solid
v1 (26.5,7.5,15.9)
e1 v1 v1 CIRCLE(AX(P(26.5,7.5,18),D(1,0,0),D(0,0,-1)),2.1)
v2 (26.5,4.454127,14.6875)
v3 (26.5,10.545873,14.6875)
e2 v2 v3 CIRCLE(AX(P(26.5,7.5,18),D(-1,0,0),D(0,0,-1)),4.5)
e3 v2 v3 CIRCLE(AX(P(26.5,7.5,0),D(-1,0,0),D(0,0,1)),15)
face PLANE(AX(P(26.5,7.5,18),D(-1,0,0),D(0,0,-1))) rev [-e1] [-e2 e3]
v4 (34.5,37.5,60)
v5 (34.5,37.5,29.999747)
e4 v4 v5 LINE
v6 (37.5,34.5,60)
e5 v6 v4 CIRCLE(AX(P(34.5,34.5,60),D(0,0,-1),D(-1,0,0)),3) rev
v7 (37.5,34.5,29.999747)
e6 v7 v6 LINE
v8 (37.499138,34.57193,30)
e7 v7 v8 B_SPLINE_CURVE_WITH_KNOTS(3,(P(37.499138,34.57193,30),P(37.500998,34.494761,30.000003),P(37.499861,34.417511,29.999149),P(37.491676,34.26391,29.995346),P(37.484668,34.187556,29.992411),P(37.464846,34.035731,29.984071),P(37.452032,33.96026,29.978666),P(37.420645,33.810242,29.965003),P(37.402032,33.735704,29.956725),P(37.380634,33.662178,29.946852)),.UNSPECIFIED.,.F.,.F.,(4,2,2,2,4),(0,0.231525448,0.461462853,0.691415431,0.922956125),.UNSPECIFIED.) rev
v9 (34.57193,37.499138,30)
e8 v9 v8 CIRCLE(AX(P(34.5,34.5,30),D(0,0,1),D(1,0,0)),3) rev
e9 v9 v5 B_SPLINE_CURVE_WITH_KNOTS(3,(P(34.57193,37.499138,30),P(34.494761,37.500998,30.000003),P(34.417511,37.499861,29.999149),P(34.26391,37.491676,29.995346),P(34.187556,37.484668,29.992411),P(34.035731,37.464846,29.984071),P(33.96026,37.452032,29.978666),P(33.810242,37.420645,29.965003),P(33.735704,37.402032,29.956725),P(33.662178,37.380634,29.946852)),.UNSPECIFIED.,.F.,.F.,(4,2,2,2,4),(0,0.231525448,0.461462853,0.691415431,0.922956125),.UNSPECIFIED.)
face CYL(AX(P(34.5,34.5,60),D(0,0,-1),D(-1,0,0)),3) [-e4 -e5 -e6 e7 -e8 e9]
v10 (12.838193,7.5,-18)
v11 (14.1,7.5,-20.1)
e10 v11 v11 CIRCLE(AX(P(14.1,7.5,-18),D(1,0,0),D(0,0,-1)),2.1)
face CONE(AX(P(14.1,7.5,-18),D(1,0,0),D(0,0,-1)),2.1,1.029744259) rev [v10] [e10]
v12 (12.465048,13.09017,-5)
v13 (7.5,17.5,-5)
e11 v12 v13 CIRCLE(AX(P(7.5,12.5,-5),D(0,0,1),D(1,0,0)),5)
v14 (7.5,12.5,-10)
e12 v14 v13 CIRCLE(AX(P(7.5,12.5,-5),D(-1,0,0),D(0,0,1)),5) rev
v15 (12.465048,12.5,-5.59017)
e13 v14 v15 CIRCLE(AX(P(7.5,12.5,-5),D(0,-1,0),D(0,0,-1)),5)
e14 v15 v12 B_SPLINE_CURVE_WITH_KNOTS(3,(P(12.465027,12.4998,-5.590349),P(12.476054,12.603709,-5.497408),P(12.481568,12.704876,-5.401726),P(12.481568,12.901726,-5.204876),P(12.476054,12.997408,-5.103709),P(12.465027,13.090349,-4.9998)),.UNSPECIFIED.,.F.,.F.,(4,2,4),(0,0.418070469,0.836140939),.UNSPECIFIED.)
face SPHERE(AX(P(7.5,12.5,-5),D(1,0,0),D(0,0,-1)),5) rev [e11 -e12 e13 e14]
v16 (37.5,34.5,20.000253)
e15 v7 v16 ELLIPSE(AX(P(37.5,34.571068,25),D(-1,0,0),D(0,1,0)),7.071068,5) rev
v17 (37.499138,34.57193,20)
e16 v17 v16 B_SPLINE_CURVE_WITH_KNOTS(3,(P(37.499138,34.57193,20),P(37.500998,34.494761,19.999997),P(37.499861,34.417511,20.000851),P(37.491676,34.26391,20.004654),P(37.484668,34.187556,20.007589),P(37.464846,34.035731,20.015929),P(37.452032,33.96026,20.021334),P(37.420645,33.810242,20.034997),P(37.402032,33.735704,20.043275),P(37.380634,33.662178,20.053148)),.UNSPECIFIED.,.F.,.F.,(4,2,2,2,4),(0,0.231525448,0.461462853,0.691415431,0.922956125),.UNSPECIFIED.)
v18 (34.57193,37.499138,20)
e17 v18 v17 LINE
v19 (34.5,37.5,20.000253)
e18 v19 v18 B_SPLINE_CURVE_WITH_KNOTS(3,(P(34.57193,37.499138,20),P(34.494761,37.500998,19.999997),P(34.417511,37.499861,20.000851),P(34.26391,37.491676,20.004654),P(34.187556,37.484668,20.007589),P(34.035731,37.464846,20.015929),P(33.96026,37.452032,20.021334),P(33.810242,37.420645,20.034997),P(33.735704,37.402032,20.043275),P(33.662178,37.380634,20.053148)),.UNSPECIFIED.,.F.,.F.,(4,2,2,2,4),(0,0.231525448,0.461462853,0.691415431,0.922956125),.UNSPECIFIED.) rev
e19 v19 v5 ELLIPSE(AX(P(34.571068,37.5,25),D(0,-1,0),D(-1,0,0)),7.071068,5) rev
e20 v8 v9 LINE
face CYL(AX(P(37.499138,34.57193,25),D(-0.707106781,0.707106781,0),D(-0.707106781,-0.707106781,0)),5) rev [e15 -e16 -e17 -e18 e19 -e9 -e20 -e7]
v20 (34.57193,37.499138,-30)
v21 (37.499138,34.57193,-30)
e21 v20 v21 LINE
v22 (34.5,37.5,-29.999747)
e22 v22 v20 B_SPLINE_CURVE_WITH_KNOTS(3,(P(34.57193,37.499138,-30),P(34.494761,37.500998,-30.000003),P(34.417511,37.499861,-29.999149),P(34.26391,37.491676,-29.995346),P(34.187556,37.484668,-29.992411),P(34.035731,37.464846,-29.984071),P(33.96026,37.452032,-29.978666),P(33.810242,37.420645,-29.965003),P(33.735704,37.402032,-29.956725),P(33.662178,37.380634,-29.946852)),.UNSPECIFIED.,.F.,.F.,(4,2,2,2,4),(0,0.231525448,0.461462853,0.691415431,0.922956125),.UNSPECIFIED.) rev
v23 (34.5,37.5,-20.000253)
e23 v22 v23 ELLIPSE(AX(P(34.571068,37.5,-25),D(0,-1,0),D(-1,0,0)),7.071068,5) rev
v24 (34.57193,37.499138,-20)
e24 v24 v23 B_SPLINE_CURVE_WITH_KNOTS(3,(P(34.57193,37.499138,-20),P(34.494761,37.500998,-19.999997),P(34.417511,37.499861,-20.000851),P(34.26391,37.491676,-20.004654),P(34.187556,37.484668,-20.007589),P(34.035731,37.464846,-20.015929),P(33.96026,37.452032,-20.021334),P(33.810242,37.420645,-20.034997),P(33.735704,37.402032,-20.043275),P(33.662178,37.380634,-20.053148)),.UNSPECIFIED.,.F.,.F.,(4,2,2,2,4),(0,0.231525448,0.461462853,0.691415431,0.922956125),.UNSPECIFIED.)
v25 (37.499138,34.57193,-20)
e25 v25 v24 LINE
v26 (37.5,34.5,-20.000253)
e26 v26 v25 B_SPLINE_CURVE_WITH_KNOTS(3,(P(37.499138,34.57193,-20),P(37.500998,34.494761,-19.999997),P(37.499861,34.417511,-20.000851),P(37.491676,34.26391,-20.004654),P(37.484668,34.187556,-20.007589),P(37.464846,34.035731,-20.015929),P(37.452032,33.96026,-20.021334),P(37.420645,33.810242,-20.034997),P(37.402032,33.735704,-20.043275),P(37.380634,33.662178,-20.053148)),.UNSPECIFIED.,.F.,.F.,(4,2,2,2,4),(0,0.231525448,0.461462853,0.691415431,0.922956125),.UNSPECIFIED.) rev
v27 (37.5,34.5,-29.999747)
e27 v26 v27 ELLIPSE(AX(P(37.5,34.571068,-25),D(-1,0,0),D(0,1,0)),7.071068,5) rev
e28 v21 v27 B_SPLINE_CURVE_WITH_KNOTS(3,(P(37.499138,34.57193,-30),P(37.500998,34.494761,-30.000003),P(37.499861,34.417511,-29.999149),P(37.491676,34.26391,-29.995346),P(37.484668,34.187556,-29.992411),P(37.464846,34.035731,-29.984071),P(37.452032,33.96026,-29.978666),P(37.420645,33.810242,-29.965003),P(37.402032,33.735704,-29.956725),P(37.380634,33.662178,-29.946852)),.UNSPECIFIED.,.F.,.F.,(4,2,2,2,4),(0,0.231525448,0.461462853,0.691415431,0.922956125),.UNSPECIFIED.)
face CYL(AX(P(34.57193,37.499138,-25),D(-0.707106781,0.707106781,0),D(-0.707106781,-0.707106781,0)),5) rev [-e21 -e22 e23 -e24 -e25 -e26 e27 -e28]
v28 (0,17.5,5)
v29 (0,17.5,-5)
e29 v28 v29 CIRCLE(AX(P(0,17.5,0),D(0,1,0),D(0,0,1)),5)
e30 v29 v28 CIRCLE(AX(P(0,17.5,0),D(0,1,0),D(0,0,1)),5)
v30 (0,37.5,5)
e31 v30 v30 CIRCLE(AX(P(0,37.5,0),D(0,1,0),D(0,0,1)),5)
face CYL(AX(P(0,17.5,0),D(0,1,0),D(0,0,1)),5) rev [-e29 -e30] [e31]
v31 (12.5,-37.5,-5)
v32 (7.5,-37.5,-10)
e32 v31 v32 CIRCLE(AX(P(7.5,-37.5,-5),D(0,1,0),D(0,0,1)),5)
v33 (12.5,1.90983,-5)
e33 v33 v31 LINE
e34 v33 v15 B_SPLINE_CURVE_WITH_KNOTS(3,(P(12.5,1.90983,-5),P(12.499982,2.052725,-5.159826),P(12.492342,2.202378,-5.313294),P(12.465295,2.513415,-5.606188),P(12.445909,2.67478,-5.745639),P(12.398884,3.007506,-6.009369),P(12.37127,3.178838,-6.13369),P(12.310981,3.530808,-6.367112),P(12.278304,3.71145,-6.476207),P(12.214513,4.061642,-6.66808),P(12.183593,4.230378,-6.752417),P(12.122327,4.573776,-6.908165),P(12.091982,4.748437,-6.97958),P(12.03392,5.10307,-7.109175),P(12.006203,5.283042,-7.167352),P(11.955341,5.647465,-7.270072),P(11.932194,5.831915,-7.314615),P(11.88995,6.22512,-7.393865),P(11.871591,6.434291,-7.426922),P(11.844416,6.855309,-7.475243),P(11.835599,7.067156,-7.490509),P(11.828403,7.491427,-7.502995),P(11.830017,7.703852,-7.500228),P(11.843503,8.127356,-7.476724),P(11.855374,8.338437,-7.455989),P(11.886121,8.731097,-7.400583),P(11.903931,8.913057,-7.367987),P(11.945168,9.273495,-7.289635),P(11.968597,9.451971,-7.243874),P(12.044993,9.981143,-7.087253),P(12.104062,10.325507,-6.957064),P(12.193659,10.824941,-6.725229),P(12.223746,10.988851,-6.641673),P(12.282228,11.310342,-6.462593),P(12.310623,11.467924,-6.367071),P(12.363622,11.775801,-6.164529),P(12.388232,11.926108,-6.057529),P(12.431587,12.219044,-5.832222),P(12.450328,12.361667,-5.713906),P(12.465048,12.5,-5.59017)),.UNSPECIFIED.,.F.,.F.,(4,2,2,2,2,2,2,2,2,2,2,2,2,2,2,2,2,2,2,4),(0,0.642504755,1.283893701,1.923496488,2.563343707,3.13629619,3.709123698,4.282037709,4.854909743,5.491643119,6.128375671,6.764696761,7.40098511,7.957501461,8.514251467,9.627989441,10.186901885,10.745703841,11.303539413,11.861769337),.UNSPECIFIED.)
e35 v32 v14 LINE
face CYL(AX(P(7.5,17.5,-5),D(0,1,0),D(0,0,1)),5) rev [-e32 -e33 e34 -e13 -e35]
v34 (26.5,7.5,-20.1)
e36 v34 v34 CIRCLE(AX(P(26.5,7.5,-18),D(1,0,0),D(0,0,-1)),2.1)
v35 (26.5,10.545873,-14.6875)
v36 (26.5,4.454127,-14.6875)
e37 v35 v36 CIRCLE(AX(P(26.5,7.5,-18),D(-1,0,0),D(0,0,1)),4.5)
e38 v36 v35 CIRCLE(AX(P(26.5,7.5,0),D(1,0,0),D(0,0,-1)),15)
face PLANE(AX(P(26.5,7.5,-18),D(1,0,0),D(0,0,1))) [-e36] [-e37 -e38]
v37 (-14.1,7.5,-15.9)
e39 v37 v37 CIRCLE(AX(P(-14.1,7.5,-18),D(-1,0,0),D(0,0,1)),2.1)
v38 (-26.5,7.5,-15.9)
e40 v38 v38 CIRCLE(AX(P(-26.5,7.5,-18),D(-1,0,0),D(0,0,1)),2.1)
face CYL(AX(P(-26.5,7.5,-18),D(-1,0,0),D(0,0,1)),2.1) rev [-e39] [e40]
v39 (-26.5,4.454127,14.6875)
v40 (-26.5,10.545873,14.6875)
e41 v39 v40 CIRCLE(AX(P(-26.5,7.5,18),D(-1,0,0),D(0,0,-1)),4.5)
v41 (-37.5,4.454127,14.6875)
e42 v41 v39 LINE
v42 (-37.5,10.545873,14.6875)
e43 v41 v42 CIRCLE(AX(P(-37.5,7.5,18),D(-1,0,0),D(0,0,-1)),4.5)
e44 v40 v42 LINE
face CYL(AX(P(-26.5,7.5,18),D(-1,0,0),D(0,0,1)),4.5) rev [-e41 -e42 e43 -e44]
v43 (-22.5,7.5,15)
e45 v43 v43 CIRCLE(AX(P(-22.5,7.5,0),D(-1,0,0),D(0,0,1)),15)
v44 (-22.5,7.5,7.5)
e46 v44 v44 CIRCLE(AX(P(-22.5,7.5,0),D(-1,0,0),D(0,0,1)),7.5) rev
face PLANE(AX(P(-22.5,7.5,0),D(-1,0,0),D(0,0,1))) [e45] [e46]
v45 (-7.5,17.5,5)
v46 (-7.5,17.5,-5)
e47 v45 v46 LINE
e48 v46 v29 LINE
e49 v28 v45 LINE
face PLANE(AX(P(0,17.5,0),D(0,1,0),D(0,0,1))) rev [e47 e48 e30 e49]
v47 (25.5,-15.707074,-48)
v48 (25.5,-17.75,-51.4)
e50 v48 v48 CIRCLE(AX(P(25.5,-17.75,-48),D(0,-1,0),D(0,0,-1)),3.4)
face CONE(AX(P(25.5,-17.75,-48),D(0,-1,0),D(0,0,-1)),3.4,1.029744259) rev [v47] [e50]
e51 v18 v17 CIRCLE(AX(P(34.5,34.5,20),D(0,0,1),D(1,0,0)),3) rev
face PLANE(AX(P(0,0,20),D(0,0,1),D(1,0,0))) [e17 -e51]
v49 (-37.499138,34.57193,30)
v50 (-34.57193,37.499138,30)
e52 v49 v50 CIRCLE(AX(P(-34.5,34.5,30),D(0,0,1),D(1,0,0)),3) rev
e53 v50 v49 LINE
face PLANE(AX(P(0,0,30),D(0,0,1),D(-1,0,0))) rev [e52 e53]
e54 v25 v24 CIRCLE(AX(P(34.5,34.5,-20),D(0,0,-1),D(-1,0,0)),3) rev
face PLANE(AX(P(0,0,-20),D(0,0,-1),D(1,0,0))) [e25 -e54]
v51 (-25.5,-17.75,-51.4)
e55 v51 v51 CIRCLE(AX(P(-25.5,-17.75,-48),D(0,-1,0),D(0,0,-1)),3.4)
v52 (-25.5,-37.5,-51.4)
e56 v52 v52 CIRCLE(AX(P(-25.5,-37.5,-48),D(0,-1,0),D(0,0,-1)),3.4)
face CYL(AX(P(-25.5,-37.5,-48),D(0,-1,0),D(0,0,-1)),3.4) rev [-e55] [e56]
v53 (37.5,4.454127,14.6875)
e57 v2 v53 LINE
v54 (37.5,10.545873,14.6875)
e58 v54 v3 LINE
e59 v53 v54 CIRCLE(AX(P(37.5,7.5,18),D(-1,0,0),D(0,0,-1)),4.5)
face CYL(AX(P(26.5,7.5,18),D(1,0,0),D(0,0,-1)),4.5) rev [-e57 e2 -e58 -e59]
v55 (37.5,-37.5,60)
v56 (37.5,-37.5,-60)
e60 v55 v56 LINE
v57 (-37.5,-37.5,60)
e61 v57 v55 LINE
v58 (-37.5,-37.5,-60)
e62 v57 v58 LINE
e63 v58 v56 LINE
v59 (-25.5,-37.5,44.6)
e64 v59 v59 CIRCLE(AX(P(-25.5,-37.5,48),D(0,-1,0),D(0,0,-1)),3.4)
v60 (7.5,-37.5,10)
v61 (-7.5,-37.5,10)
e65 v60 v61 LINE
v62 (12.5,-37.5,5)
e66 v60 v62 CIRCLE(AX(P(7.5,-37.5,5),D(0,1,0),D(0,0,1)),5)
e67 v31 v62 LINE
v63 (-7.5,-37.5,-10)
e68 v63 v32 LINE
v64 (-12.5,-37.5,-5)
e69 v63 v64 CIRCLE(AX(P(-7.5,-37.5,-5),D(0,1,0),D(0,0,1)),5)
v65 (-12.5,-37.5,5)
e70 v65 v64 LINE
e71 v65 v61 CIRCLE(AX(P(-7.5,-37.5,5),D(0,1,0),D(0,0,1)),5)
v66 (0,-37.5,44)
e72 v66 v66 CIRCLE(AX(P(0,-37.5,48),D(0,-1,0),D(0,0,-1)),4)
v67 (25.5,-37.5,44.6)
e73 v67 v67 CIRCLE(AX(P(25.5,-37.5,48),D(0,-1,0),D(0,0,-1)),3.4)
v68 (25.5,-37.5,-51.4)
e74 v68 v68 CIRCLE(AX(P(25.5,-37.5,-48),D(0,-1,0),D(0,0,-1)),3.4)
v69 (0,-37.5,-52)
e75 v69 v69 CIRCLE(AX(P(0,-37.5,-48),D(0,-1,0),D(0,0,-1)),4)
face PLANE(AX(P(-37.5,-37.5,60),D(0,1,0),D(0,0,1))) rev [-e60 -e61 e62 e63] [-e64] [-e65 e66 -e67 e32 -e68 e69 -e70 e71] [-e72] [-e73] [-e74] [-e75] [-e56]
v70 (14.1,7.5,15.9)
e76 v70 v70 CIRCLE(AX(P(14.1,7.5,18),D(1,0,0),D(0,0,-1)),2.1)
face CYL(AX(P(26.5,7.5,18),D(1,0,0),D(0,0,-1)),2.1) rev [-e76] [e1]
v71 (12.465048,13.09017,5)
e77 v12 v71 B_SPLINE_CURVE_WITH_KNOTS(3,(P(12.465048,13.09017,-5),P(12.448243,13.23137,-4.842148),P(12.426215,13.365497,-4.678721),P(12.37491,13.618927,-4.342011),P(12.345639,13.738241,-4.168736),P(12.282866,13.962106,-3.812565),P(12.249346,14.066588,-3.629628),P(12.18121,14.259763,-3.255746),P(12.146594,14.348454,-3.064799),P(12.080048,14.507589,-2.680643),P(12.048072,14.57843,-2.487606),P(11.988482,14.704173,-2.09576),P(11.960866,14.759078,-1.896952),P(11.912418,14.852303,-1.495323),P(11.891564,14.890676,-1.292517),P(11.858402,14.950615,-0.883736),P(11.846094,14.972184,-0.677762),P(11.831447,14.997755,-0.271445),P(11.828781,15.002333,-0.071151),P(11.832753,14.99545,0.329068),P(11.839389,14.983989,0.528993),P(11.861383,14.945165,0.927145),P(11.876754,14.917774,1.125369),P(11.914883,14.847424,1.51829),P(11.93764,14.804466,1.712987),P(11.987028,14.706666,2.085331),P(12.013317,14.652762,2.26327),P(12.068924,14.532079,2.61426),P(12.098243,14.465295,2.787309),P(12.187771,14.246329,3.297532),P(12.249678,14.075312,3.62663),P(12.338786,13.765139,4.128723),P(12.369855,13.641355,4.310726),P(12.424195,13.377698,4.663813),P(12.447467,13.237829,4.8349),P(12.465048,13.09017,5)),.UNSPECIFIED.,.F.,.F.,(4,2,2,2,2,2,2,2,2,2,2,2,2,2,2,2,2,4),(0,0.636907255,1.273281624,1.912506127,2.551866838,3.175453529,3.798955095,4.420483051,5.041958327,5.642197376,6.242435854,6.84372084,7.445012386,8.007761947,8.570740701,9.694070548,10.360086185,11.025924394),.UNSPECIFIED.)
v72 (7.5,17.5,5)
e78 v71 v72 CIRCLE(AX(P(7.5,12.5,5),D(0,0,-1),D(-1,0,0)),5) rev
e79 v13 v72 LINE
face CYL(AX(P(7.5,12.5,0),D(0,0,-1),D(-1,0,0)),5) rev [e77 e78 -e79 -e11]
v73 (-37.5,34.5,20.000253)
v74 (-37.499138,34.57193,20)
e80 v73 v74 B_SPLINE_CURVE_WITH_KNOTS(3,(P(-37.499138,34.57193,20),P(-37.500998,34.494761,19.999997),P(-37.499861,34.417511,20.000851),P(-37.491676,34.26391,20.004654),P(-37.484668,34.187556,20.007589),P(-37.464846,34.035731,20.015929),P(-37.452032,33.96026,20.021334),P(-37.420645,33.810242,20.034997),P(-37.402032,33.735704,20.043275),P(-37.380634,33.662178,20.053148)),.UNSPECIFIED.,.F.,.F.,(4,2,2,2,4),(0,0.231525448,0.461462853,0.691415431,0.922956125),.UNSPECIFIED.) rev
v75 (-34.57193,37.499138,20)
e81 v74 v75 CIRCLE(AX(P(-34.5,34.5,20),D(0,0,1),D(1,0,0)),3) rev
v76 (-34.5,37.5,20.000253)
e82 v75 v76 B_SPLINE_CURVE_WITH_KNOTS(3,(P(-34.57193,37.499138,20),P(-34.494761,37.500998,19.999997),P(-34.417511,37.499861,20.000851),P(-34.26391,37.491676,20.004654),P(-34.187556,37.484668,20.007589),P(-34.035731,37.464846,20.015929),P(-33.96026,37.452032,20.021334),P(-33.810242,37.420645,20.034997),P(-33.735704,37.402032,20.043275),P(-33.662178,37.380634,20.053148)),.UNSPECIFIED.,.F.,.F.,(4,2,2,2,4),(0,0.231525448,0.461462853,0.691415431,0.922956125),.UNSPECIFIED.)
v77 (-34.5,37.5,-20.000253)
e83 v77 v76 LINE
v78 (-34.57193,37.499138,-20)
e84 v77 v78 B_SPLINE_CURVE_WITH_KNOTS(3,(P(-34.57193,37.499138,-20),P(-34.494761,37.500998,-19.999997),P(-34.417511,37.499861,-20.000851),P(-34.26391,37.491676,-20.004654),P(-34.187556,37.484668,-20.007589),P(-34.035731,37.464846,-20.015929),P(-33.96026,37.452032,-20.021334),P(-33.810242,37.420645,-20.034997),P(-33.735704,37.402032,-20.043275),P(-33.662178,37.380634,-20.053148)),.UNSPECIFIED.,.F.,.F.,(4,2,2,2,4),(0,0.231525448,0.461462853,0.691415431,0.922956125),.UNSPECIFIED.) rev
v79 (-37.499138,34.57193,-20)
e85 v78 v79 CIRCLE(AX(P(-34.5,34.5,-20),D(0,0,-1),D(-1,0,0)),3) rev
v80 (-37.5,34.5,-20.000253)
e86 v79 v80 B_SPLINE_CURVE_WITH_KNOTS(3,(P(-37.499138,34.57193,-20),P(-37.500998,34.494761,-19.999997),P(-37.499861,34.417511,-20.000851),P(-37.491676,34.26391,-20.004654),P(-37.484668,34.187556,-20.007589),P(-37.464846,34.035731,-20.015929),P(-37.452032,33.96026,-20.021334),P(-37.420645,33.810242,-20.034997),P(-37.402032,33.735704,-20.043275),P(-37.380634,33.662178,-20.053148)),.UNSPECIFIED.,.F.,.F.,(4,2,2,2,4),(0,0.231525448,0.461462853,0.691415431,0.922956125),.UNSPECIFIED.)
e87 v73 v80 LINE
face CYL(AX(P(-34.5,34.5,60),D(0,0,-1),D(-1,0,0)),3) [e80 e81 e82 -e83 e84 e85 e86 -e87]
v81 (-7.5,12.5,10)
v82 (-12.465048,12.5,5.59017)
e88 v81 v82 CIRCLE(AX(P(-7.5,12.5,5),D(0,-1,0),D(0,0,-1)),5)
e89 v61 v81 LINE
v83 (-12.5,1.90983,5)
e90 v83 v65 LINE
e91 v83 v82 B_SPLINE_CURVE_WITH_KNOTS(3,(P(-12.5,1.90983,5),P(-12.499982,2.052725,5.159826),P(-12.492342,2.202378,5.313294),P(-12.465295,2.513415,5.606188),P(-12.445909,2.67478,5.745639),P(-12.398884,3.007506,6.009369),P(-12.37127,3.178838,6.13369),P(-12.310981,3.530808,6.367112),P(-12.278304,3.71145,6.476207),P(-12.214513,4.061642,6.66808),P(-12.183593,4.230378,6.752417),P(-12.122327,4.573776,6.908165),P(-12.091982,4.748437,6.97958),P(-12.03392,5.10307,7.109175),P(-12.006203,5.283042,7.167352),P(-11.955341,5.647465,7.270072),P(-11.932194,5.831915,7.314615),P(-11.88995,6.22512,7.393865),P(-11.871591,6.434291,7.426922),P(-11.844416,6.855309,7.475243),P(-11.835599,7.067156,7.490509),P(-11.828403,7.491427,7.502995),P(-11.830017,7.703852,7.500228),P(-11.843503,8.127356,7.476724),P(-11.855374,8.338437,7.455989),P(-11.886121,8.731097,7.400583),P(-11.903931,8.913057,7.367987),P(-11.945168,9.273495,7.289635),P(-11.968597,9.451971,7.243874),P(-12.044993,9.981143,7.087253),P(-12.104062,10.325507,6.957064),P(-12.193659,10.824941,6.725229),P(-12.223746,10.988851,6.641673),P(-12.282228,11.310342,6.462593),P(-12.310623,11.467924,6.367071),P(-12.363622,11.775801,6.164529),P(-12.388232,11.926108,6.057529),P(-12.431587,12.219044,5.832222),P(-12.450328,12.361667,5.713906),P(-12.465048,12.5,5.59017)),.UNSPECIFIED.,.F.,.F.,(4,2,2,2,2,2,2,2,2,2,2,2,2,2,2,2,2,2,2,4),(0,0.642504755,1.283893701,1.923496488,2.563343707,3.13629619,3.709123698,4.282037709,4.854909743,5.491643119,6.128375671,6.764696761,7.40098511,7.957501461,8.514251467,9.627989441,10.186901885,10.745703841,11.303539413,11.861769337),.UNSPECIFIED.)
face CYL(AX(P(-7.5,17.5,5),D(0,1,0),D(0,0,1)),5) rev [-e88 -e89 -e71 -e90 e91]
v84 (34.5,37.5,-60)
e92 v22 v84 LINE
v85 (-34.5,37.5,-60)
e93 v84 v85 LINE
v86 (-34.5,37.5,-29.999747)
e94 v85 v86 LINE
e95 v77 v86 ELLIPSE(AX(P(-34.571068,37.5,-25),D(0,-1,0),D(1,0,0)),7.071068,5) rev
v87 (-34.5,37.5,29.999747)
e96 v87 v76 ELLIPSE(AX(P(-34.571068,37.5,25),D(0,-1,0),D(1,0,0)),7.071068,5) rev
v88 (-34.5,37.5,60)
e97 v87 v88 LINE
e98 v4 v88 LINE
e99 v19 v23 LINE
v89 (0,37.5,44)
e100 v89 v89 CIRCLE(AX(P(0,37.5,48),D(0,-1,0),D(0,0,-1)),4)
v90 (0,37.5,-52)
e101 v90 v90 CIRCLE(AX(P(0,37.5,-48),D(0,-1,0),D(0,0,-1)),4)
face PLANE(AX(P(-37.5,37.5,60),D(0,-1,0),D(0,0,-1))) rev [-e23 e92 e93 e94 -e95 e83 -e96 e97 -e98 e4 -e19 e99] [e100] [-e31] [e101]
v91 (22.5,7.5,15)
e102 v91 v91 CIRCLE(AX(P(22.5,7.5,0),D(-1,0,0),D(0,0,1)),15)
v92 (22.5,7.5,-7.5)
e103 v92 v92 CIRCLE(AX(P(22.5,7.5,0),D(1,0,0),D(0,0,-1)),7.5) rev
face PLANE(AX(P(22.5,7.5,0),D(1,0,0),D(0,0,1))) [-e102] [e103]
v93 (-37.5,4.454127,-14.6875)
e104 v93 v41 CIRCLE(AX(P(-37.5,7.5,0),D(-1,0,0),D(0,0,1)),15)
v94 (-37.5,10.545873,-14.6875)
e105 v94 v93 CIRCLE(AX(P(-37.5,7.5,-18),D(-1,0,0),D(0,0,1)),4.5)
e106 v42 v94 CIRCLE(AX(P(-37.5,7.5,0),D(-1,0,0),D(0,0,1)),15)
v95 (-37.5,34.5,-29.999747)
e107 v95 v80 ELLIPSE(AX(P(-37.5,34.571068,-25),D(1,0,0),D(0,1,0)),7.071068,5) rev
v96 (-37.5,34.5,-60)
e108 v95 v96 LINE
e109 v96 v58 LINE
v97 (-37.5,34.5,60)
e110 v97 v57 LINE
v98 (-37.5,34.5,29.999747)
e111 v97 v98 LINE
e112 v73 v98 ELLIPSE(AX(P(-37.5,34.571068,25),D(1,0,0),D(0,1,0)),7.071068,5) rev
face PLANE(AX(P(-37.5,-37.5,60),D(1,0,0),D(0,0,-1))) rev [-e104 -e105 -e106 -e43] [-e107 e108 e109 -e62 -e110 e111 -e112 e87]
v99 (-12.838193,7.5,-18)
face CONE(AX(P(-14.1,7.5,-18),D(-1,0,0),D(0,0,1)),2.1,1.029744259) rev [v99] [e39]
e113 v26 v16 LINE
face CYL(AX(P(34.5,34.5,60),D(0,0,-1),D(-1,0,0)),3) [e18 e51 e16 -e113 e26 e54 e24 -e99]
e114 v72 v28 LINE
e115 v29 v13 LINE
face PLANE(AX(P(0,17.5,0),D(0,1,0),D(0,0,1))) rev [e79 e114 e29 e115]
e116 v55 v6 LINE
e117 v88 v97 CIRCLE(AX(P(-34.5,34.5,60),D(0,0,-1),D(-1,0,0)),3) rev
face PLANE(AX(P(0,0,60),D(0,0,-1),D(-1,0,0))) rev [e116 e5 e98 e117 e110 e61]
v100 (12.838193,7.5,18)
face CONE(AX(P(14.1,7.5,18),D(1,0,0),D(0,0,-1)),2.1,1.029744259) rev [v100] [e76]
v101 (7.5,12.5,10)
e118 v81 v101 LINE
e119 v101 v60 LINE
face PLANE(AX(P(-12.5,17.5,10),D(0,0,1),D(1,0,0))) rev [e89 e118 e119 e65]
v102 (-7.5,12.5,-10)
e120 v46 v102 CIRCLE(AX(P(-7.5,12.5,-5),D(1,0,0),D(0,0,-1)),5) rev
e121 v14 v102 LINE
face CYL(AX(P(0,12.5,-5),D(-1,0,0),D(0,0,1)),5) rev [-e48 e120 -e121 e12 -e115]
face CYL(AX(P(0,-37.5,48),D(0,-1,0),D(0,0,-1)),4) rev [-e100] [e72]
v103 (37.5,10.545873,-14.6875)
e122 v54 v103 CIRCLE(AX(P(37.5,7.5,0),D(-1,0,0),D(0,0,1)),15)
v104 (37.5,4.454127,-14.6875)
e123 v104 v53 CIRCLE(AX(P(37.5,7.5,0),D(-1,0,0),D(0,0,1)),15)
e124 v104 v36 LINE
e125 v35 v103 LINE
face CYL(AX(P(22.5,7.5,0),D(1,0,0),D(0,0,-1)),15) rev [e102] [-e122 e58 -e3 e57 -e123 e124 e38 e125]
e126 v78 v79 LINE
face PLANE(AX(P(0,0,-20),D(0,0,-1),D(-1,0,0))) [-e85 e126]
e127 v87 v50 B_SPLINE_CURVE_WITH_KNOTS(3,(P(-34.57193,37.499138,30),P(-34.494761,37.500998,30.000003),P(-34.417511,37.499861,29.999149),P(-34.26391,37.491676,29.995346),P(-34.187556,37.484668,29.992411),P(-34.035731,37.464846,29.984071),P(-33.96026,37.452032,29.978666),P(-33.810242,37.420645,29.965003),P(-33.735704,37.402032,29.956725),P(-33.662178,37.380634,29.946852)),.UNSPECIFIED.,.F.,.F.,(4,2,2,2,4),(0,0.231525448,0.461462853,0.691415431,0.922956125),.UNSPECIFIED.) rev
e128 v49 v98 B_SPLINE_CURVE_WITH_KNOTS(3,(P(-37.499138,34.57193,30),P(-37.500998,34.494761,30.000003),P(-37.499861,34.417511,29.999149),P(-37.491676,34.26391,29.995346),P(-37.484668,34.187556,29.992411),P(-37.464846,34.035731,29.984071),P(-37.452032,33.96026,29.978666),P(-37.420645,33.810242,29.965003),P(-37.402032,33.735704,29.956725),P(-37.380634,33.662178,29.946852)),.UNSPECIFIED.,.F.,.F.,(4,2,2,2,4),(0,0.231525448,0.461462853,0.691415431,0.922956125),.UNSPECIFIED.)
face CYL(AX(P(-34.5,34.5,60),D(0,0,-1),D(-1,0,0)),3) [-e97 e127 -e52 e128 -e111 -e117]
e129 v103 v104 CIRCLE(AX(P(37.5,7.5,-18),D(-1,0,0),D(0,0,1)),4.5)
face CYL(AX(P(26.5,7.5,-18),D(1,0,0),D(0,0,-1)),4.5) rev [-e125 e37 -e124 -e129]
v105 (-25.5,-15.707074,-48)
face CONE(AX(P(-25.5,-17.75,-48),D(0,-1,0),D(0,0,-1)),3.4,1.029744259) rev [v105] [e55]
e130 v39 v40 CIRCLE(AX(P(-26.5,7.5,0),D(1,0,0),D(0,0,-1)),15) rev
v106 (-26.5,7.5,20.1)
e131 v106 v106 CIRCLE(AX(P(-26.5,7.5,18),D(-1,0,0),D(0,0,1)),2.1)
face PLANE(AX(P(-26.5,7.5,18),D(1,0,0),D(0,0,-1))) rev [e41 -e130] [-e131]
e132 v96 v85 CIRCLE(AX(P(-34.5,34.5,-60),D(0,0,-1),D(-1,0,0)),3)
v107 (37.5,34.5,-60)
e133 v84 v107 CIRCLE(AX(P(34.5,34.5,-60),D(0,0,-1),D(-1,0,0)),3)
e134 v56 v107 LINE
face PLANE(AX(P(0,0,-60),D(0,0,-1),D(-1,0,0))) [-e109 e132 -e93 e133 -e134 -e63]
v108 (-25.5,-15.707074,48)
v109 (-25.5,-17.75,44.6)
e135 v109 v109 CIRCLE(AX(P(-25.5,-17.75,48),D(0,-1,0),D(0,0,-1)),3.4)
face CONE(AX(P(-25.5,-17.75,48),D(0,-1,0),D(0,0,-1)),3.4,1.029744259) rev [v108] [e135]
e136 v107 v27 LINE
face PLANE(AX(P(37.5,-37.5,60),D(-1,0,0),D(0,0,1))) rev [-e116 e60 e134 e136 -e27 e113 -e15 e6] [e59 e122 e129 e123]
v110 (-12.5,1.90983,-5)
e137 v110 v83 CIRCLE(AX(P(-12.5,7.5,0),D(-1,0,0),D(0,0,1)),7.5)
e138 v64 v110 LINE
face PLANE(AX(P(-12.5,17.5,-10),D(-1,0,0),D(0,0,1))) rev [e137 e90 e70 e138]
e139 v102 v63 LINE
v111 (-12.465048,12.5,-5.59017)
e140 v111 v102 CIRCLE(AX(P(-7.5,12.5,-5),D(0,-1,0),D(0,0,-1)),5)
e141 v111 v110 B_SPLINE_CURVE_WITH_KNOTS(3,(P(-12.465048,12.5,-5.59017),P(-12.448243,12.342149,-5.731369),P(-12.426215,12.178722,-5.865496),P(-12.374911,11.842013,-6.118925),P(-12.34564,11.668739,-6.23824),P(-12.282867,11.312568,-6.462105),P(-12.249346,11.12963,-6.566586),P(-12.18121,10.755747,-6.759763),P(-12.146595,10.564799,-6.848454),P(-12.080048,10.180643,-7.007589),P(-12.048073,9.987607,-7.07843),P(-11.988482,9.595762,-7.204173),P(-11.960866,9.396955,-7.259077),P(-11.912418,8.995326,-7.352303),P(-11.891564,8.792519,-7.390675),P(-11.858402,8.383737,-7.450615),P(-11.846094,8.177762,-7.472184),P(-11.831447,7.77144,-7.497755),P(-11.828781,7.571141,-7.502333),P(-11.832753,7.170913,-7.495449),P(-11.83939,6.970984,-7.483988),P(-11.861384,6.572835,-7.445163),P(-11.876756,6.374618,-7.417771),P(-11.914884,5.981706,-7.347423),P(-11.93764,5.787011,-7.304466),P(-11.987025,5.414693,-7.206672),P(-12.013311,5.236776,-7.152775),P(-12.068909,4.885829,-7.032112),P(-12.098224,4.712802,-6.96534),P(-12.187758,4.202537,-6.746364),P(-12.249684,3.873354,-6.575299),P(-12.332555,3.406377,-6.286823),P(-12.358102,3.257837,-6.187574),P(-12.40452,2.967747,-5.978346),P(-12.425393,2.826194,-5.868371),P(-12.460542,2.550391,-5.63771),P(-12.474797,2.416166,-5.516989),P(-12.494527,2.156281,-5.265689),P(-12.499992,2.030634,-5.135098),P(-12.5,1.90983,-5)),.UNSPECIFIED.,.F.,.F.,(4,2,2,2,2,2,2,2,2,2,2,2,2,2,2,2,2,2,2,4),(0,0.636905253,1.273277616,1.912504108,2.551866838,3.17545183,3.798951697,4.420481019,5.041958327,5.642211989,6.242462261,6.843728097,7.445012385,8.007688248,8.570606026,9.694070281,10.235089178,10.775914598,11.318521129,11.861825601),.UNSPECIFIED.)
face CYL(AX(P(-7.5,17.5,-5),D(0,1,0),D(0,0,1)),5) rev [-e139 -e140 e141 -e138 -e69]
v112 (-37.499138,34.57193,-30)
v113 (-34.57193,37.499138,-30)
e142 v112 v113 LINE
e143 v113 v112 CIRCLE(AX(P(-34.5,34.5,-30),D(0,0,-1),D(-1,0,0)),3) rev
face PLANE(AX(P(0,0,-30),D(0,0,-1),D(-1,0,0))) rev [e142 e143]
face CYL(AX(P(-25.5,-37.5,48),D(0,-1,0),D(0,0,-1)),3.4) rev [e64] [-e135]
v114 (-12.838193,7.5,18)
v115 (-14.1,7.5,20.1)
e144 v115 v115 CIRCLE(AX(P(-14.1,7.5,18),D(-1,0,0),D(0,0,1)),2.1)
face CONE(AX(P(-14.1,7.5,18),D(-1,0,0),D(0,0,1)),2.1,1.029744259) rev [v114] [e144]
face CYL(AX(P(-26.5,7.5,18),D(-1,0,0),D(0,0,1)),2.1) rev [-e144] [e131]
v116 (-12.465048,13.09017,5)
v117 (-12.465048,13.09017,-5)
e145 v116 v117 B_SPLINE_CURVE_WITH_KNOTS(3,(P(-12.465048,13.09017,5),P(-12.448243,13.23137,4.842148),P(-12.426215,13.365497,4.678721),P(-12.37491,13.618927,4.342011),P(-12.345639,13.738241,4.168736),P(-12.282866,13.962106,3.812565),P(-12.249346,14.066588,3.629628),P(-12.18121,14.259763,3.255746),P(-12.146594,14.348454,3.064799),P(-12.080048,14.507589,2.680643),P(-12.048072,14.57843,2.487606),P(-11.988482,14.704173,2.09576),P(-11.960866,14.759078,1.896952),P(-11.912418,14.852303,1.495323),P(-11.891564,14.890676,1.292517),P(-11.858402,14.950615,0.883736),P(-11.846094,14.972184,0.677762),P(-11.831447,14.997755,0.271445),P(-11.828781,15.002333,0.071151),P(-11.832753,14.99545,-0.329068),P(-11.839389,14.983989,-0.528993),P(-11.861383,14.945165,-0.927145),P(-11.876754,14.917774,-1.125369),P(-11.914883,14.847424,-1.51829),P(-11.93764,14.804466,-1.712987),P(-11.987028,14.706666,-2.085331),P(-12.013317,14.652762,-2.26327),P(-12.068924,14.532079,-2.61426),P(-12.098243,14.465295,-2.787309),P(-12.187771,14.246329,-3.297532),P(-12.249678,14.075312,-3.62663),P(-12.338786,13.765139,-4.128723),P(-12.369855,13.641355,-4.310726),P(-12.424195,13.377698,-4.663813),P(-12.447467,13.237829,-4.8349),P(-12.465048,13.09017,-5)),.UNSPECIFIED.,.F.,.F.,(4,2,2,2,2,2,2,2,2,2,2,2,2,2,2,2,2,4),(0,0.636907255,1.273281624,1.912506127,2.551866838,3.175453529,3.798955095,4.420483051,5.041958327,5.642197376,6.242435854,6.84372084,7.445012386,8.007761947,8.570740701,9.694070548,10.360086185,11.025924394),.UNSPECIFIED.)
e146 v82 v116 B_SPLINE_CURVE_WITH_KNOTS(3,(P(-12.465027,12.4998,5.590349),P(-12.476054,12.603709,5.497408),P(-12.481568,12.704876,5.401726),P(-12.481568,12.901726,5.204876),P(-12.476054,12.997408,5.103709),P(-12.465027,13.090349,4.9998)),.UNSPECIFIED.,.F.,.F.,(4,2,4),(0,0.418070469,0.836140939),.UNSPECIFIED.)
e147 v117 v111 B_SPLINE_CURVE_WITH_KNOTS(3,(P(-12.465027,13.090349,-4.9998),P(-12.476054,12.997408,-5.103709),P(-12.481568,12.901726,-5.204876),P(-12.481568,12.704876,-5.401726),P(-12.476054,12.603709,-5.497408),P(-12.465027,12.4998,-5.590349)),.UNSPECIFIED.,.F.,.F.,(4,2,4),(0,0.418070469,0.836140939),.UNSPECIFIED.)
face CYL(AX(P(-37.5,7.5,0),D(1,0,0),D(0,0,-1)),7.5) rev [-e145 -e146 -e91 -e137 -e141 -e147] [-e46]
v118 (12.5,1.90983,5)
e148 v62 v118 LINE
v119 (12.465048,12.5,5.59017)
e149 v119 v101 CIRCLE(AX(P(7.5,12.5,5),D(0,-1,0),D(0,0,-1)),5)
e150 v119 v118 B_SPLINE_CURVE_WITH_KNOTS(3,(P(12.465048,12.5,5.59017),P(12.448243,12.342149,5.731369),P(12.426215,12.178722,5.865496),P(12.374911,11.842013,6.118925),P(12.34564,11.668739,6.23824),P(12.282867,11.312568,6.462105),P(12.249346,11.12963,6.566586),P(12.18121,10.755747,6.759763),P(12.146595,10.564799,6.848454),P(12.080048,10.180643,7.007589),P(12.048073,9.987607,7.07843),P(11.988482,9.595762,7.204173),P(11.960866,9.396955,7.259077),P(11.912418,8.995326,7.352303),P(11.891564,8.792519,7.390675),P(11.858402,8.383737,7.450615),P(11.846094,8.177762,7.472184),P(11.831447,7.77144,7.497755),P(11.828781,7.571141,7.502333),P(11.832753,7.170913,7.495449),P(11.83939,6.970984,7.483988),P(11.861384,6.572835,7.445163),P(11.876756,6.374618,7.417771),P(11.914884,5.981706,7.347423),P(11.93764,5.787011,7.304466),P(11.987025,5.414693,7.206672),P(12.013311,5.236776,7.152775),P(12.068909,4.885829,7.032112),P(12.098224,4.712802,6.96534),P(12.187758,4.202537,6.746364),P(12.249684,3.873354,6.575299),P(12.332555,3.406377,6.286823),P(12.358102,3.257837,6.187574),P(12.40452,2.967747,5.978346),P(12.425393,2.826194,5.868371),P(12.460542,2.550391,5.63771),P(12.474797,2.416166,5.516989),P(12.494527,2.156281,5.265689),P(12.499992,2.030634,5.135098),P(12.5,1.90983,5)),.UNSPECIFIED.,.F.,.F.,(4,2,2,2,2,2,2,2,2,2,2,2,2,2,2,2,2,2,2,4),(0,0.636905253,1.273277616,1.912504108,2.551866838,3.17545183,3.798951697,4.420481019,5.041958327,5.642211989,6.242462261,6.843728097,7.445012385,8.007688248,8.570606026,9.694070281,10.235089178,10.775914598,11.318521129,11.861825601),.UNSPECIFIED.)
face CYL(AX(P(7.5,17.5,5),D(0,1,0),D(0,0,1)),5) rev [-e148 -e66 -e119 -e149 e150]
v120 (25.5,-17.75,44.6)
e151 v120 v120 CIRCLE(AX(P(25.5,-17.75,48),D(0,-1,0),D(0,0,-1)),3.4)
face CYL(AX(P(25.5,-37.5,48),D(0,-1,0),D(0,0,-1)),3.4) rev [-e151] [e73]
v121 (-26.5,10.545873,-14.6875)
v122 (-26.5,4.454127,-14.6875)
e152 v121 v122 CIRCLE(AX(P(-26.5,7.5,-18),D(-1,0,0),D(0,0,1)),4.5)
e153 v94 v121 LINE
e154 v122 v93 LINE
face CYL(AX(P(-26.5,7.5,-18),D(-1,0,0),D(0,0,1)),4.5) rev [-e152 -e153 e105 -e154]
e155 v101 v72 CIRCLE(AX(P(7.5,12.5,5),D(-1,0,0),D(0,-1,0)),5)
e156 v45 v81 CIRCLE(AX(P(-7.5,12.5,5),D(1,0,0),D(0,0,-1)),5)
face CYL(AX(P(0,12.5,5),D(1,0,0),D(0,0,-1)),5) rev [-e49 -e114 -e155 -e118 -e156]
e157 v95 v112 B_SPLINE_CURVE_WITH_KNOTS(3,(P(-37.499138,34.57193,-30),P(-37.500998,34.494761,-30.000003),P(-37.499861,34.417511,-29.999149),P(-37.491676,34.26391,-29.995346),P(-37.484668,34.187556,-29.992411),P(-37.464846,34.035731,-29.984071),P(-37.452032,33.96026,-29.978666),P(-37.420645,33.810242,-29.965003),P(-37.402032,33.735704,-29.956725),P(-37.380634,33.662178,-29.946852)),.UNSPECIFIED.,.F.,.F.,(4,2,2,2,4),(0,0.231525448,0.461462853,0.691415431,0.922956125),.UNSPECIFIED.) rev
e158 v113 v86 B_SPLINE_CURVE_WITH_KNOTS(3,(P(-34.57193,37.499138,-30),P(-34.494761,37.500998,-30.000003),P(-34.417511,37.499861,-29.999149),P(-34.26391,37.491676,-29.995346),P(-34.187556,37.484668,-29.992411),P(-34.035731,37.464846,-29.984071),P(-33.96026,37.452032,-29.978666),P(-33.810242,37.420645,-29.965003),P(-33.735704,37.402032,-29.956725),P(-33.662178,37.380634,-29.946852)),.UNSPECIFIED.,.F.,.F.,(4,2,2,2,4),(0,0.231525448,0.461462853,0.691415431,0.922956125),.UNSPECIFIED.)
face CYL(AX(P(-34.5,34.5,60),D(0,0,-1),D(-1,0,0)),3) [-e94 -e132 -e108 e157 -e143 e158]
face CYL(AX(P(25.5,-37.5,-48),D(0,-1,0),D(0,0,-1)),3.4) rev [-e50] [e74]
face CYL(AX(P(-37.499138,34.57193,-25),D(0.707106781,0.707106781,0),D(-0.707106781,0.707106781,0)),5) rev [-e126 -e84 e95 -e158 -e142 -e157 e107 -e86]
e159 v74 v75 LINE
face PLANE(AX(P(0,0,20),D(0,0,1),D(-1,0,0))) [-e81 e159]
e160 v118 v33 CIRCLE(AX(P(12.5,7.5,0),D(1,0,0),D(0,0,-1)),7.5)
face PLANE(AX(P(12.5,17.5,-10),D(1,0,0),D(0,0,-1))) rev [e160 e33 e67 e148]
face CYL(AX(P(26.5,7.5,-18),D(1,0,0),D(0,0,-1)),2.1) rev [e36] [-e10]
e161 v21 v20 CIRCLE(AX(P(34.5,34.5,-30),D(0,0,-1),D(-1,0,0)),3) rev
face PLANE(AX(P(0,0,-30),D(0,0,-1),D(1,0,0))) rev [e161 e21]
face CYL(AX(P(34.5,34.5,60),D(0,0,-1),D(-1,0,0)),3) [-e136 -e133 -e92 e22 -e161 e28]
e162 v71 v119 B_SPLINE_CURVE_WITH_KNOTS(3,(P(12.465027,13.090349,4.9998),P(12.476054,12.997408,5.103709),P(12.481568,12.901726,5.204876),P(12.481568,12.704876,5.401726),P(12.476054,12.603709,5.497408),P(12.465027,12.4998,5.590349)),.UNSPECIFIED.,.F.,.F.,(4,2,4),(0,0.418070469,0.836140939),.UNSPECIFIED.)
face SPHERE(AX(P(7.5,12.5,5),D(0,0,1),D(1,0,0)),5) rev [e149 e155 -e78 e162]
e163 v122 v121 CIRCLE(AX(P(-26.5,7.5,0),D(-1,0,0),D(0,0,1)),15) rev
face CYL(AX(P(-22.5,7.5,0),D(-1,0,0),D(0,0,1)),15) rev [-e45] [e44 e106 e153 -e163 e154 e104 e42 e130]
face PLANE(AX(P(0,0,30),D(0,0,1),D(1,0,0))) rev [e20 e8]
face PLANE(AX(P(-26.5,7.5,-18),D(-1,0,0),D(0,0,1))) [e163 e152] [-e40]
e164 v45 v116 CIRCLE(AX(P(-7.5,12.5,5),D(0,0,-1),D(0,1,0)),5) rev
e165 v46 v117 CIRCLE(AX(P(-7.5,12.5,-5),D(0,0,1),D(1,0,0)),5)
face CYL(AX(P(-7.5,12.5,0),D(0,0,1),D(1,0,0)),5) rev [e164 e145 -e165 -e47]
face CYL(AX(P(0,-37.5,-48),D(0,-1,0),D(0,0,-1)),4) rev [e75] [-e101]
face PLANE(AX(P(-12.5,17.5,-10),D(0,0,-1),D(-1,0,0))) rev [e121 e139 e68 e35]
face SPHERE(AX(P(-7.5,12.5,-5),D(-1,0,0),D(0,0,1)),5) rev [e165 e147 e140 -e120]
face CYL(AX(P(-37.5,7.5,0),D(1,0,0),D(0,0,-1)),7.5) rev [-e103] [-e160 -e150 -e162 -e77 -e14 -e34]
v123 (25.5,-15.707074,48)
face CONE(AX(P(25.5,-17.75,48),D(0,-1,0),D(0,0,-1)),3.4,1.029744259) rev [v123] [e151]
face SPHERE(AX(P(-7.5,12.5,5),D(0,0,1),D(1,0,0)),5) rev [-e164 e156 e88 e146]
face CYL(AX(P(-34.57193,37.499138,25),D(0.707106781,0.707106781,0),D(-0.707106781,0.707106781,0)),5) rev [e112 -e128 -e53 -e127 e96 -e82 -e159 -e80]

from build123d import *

# Parameters (mm, degrees)
SKETCH1_W                  = 75
SKETCH1_H                  = 75
BOSS_EXTRUDE1_DEPTH        = 60
SKETCH2_R                  = 5
CUT_EXTRUDE1_DEPTH         = 20
FILLET1_R                  = 3
CUT_EXTRUDE2_DEPTH         = 5
FILLET2_R                  = 5
FILLET2_OF_MIRROR1_R       = 5
MIRROR2_START              = -7.071067908
MIRROR2_DEPTH              = 14.142135816
SKETCH4_W                  = 25
SKETCH4_H                  = 20
CUT_EXTRUDE3_DEPTH         = 55
FILLET3_R                  = 5
CUT_EXTRUDE4_DEPTH         = 81.078087059
CUT_EXTRUDE4_DEPTH_BACK    = 81.078087059
SKETCH5_R                  = 7.5
SKETCH7_R                  = 15
CUT_EXTRUDE5_DEPTH         = 15
SKETCH8_R                  = 4.5
CUT_EXTRUDE6_DEPTH         = 11
M5_TAPPED_HOLE1_AT_2_COUNT = 2
M5_TAPPED_HOLE1_AT_2_PITCH = 36
M8_TAPPED_HOLE1_D          = 6.8
M8_TAPPED_HOLE1_DEPTH      = 19.75
M8_TAPPED_HOLE1_TIP        = 2.042926105
F_8_0MM_DOWEL_HOLE1_D      = 8


# Read off the part's stored shape, not the designer's step: Mirror2
with BuildPart() as part:
    # Sketch1 → Boss-Extrude1 (new, symmetric)
    with BuildSketch(Plane.XY):
        Rectangle(SKETCH1_W, SKETCH1_H)
    extrude(amount=BOSS_EXTRUDE1_DEPTH, both=True)

    # Sketch2 → Cut-Extrude1 (cut)
    with BuildSketch(Plane(origin=(0, 37.5, 0), x_dir=(1, 0, 0), z_dir=(0, 1, 0))):
        with Locations(Location((0, 0, 0), (0, 0, 270))):
            Circle(SKETCH2_R)
    extrude(amount=-CUT_EXTRUDE1_DEPTH, mode=Mode.SUBTRACT)

    # Fillet1
    fillet1_edges = [part.edges().sort_by_distance(p)[0] for p in [
        (-37.5, 37.5, 0),
        (37.5, 37.5, 0),
    ]]
    fillet(fillet1_edges, radius=FILLET1_R)

    # Sketch3 → Cut-Extrude2 (cut, symmetric)
    with BuildSketch(Plane.XY.offset(-25)):
        Polygon((-37.5, 27.5), (-27.5, 37.5), (-37.5, 37.5), align=None)
    cut_extrude2 = extrude(amount=CUT_EXTRUDE2_DEPTH, both=True, mode=Mode.SUBTRACT)

    # Fillet2
    fillet2_edges = [part.edges().sort_by_distance(p)[0] for p in [
        (-32.5, 32.5, -30),
        (-32.5, 32.5, -20),
    ]]
    fillet(fillet2_edges, radius=FILLET2_R - 0.0001)  # a hair under: the kernel refuses the full size

    # Mirror1: Cut-Extrude2 across plane
    add(cut_extrude2.mirror(Plane.XY), mode=Mode.SUBTRACT)

    # Fillet2 of Mirror1
    fillet2_of_mirror1_edges = [part.edges().sort_by_distance(p)[0] for p in [
        (-32.5, 32.5, 30),
        (-32.5, 32.5, 20),
    ]]
    fillet(fillet2_of_mirror1_edges, radius=FILLET2_OF_MIRROR1_R - 0.0001)  # a hair under: the kernel refuses the full size

    # Mirror2 outline → Mirror2 (cut)
    with BuildSketch(Plane(origin=(0, 0, 0), x_dir=(0.707106781186546, 0.707106781186549, 0), z_dir=(0.707106781186549, -0.707106781186546, 0)).offset(MIRROR2_START)):
        with BuildLine():
            ThreePointArc((50.961940783, 30.000000002), (45.961940781, 25), (50.961940783, 19.999999998))
            Line((50.961940783, 19.999999998), (53, 20))
            Line((53, 20), (53, 30))
            Line((53, 30), (50.961940783, 30.000000002))
        make_face()
        with BuildLine():
            Line((53, -30), (53, -20))
            Line((53, -20), (50.961940783, -19.999999998))
            ThreePointArc((50.961940783, -19.999999998), (45.961940781, -25), (50.961940783, -30.000000002))
            Line((50.961940783, -30.000000002), (53, -30))
        make_face()
    extrude(amount=MIRROR2_DEPTH, mode=Mode.SUBTRACT)

    # Sketch4 → Cut-Extrude3 (cut)
    with BuildSketch(Plane.XZ.offset(37.5)):
        Rectangle(SKETCH4_W, SKETCH4_H)
    extrude(amount=-CUT_EXTRUDE3_DEPTH, mode=Mode.SUBTRACT)

    # Fillet3
    fillet3_edges = [part.edges().sort_by_distance(p)[0] for p in [
        (12.5, 17.5, 0),
        (12.5, -10, 10),
        (0, 17.5, -10),
        (12.5, -10, -10),
        (-12.5, 17.5, 0),
        (-12.5, -10, -10),
        (0, 17.5, 10),
        (-12.5, -10, 10),
    ]]
    fillet(fillet3_edges, radius=FILLET3_R - 0.0001)  # a hair under: the kernel refuses the full size

    # Sketch5 → Cut-Extrude4 (cut, two sides: drawn at the far end of the back side and taken through both)
    with BuildSketch(Plane(origin=(0, 0, 0), x_dir=(0, 0, -1), z_dir=(1, 0, 0)).offset(-CUT_EXTRUDE4_DEPTH_BACK)):
        with Locations((0, 7.5)):
            Circle(SKETCH5_R)
    extrude(amount=CUT_EXTRUDE4_DEPTH + CUT_EXTRUDE4_DEPTH_BACK, mode=Mode.SUBTRACT)

    # Sketch7 → Cut-Extrude5 (cut)
    with BuildSketch(Plane.ZY.offset(37.5)):
        with Locations((0, 7.5)):
            Circle(SKETCH7_R)
    cut_extrude5 = extrude(amount=-CUT_EXTRUDE5_DEPTH, mode=Mode.SUBTRACT)

    # Mirror3: Cut-Extrude5 across plane
    add(cut_extrude5.mirror(Plane(origin=(0, 0, 0), x_dir=(0, 0, 1), z_dir=(1, 0, 0))), mode=Mode.SUBTRACT)

    # Sketch8 → Cut-Extrude6 (cut)
    with BuildSketch(Plane.ZY.offset(37.5)):
        with Locations((-18, 7.5)):
            Circle(SKETCH8_R)
        with Locations((18, 7.5)):
            Circle(SKETCH8_R)
    cut_extrude6 = extrude(amount=-CUT_EXTRUDE6_DEPTH, mode=Mode.SUBTRACT)

    # Sketch10 → M5 Tapped Hole1 (revolve, cut)
    with BuildSketch(Plane(origin=(-26.5, 7.5, -18), x_dir=(0, 0, 1), z_dir=(0, 1, 0))):
        Polygon((0, 0), (0, 13.6618073), (2.1, 12.4), (2.1, 0), align=None)
    m5_tapped_hole1 = revolve(axis=Axis((-32.85, 7.5, -18), (1, 0, 0)), mode=Mode.SUBTRACT)

    # M5 Tapped Hole1 at 2: M5 Tapped Hole1 ×2
    with Locations(*[(0, 0, i * M5_TAPPED_HOLE1_AT_2_PITCH) for i in range(1, M5_TAPPED_HOLE1_AT_2_COUNT)]):
        add(m5_tapped_hole1, mode=Mode.SUBTRACT)

    # Mirror4: Cut-Extrude6, M5 Tapped Hole1 across plane
    add(cut_extrude6.mirror(Plane(origin=(0, 0, 0), x_dir=(0, 0, 1), z_dir=(1, 0, 0))), mode=Mode.SUBTRACT)
    add(m5_tapped_hole1.mirror(Plane(origin=(0, 0, 0), x_dir=(0, 0, 1), z_dir=(1, 0, 0))), mode=Mode.SUBTRACT)

    # Mirror4 copy 1 sketch → Mirror4 copy 1 (revolve, cut)
    with BuildSketch(Plane(origin=(26.5, 7.5, 18), x_dir=(0, 0, 1), z_dir=(0, 1, 0))):
        Polygon((0, 0), (0, -13.6618073), (2.1, -12.4), (2.1, 0), align=None)
    revolve(axis=Axis((32.85, 7.5, 18), (1, 0, 0)), mode=Mode.SUBTRACT)

    # M8 Tapped Hole1
    with Locations(Plane(origin=(0, -37.5, 0), x_dir=(-1, 0, 0), z_dir=(0, -1, 0))):
        with Locations((-25.5, 48), (25.5, 48), (25.5, -48), (-25.5, -48)):
            Hole(M8_TAPPED_HOLE1_D / 2, depth=M8_TAPPED_HOLE1_DEPTH)
            with Locations((0, 0, -(M8_TAPPED_HOLE1_DEPTH + M8_TAPPED_HOLE1_TIP / 2))):  # 118° drill point
                Cone(0, M8_TAPPED_HOLE1_D / 2, M8_TAPPED_HOLE1_TIP, mode=Mode.SUBTRACT)

    # Ø8.0mm Dowel Hole1 (through all)
    with Locations(Plane(origin=(0, -37.5, 0), x_dir=(-1, 0, 0), z_dir=(0, -1, 0))):
        with Locations((0, 48), (0, -48)):
            Hole(F_8_0MM_DOWEL_HOLE1_D / 2)


solid = part.part
